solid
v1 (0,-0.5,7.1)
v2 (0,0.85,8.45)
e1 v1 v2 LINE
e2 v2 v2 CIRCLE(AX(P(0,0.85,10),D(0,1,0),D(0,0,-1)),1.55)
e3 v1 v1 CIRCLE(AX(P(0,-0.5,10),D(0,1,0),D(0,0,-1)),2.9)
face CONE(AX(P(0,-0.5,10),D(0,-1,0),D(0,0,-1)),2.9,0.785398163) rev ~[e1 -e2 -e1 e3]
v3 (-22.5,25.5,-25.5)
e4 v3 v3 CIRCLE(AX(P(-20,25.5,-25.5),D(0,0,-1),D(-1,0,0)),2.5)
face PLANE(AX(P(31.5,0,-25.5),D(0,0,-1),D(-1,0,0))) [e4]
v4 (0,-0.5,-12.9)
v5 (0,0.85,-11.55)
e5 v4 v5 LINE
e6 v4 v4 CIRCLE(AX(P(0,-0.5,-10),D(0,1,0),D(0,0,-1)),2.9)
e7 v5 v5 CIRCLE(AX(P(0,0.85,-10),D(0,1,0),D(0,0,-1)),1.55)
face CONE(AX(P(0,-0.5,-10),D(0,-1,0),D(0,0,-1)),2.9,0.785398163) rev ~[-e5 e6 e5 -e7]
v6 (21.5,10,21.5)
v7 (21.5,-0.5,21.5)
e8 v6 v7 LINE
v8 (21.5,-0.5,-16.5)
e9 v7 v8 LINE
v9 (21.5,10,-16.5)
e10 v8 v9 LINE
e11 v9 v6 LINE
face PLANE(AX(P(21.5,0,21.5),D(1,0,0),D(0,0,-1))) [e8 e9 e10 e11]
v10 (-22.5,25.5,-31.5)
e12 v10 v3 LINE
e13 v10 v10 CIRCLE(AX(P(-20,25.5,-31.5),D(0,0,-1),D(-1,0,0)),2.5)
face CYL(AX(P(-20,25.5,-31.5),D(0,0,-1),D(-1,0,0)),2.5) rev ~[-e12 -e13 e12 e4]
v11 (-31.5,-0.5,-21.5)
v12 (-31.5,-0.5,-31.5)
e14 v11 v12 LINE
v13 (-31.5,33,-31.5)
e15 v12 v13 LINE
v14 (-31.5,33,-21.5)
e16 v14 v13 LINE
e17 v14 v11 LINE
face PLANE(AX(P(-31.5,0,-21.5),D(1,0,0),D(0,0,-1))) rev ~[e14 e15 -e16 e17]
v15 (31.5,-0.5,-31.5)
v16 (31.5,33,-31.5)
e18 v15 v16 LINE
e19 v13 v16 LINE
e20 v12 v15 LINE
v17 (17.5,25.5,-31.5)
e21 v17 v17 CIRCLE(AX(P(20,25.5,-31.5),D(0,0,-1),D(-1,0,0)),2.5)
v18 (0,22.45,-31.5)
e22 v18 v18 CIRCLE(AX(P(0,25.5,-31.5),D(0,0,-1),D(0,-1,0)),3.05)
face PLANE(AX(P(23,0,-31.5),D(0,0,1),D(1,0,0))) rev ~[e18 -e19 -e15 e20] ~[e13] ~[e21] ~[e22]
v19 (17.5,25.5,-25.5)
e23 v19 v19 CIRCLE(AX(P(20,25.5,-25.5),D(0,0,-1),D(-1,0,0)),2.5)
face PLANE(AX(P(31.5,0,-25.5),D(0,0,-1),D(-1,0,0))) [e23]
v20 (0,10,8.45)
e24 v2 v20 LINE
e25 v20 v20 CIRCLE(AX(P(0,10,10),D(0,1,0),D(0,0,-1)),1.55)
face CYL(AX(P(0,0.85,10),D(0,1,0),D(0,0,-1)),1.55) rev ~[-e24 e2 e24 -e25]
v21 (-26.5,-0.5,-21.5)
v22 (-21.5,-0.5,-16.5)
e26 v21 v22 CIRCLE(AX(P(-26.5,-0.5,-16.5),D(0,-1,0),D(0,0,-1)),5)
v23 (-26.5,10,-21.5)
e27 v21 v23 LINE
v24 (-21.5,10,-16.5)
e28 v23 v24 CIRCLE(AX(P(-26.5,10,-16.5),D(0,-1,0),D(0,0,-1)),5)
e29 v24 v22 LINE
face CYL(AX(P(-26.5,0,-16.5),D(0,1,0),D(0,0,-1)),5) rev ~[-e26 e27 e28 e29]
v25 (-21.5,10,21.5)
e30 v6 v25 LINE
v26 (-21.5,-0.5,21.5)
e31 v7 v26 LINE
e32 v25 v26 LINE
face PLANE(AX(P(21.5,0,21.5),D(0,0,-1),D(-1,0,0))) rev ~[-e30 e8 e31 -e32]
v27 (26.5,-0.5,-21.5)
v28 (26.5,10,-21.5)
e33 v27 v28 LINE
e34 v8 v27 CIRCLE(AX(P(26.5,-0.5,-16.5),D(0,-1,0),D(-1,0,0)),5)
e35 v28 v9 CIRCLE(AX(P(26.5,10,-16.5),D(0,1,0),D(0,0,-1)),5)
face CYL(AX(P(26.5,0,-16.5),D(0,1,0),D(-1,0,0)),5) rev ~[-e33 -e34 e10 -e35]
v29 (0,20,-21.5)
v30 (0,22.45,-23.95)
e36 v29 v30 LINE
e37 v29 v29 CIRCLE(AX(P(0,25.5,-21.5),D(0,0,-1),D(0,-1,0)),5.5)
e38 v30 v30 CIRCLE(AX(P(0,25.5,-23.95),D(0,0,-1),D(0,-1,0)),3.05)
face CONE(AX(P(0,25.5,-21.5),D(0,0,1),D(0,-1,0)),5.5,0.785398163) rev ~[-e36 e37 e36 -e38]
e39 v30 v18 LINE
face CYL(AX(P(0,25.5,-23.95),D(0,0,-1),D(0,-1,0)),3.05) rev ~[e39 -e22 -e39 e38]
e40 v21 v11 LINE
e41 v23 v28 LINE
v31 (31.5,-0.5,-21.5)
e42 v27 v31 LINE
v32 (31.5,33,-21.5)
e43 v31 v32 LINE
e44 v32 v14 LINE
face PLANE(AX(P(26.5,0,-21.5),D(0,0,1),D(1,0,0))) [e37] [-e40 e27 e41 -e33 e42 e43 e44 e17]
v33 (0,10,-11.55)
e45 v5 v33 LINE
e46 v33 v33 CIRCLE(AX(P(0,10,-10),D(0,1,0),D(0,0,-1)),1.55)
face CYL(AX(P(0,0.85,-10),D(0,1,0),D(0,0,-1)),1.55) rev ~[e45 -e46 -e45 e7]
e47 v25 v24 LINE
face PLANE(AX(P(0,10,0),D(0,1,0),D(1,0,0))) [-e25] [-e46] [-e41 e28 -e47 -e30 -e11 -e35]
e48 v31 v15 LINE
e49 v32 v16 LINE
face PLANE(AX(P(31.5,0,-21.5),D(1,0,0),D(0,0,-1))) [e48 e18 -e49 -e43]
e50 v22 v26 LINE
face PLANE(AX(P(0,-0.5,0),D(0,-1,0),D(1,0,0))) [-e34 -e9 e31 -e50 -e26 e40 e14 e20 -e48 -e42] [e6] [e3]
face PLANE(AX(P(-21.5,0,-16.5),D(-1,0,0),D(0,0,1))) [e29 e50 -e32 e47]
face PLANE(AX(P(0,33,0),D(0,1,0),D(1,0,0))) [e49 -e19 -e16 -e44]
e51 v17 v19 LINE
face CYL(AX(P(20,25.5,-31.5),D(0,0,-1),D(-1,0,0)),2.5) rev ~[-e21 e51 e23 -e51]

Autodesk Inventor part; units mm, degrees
ref_plane "YZ Plane" through (0, 0, 0) normal (1, 0, 0) x (0, 1, 0)
ref_plane "XZ Plane" through (0, 0, 0) normal (0, 1, 0) x (-1, 0, 0)
ref_plane "XY Plane" through (0, 0, 0) normal (0, 0, 1) x (1, 0, 0)
sketch "Sketch1" plane through (0, 0, 0) normal (0, 1, 0) x (-1, 0, 0)
  line L0 (21.5, 21.5) -> (-21.5, 21.5)
  line L1 (-21.5, 21.5) -> (-21.5, -21.5)
  line L2 (-21.5, -21.5) -> (21.5, -21.5)
  line L3 (21.5, -21.5) -> (21.5, 21.5)
  line L4 (21.5, 21.5) -> (-21.5, -21.5) construction
  line L5 (-21.5, 21.5) -> (21.5, -21.5) construction
  point P0 (0, 0)
  dimension "d0" = 43
  dimension "d1" = 43
extrude "Extrusion1" add sketch "Sketch1" along normal blind 10
sketch "Sketch3" plane through (0, 0, 0) normal (0, 1, 0) x (-1, 0, 0)
  line L0 (31.5, -31.5) -> (-31.5, -31.5)
  line L1 (-31.5, -31.5) -> (-31.5, 31.5)
  line L2 (-31.5, 31.5) -> (31.5, 31.5)
  line L3 (31.5, 31.5) -> (31.5, -31.5)
  line L4 (31.5, -31.5) -> (-31.5, 31.5) construction
  line L5 (-31.5, -31.5) -> (31.5, 31.5) construction
  line L6 (-21.5, 21.5) -> (-21.5, -21.5) projected
  line L7 (21.5, 21.5) -> (-21.5, 21.5)
  line L8 (-21.5, 21.5) -> (-21.5, -21.5)
  line L9 (-21.5, -21.5) -> (21.5, -21.5)
  line L10 (21.5, -21.5) -> (21.5, 21.5)
  line L11 (21.5, 21.5) -> (-21.5, -21.5) construction
  line L12 (-21.5, 21.5) -> (21.5, -21.5) construction
  point P0 (0, 0)
  dimension "d13" = 63
  dimension "d14" = 63
extrude "Extrusion2" add sketch "Sketch3" along normal blind 15
sketch "Sketch4" plane through (0, 15, 0) normal (0, 1, 0) x (1, 0, 0)
  line L0 (31.5, -31.5) -> (31.5, 31.5) projected
  line L1 (-31.5, 31.5) -> (31.5, 31.5)
  line L2 (31.5, 31.5) -> (31.5, 21.5)
  line L3 (31.5, 21.5) -> (-31.5, 21.5)
  line L4 (-31.5, 21.5) -> (-31.5, 31.5)
  point P0 (0, 0)
  dimension "d17" = 10
extrude "Extrusion3" add sketch "Sketch4" along normal blind 18
sketch "Sketch5" plane through (31.5, 0, -31.5) normal (0, 0, -1) x (-1, 0, 0)
  line L0 (0, 15) -> (0, 33) construction
  line L1 (63, 15) -> (63, 33) construction
  line L2 (0, 33) -> (63, 33) construction
  line L3 (63, 33) -> (63, 18) construction
  line L4 (63, 18) -> (0, 18) construction
  line L5 (0, 18) -> (0, 33) construction
  line L6 (0, 18) -> (0, 25.5) construction
  line L7 (0, 29.25) -> (63, 29.25)
  line L8 (63, 29.25) -> (63, 21.75)
  line L9 (63, 21.75) -> (0, 21.75)
  line L10 (-63, 29.25) -> (63, 21.75) construction
  line L11 (63, 29.25) -> (-63, 21.75) construction
  line L12 (0, 29.25) -> (0, 21.75)
  line L13 (31.5, 33) -> (31.5, 25.5) construction
  line L14 (31.5, 25.5) -> (11.5, 25.5) construction
  line L15 (31.5, 25.5) -> (51.5, 25.5) construction
  circle A0 centre (11.5, 25.5) radius 2.5
  circle A1 centre (51.5, 25.5) radius 2.5
  point P0 (31.5, 0)
  dimension "d20" = 15
  dimension "d21" = 7.5
  dimension "d22" = 7.5
  dimension "d33" = 20
  dimension "d34" = 20
  dimension "d35" = 5
  dimension "d36" = 5
sketch "Sketch6" plane through (-21.5, 10, -21.5) normal (0, 0, 1) x (1, 0, 0)
  line L0 (-10, 23) -> (53, 23) construction
  line L1 (53, 23) -> (53, 15.5) construction
  line L2 (53, -10) -> (53, 23) construction
  line L3 (53, 15.5) -> (-10, 15.5) construction
  line L4 (-10, -10) -> (-10, 23) construction
  line L5 (21.5, 23) -> (21.5, 15.5) construction
  point P0 (21.5, -10)
  dimension "d25" = 7.5
hole "Hole2" at (0, 25.5, -21.5) direction (0, 0, -1) diameter 6.1 end through all countersink diameter 11 countersink angle 90 clearance for "Countersunk Flat Head Screw ISO 2009/7046" size "M6" standard "ISO"
extrude "Extrusion5" cut sketch "Sketch5" against normal blind 6 contours A0 | A1
sketch "Sketch7" plane through (0, 15, 0) normal (0, 1, 0) x (1, 0, 0)
  line L0 (-31.5, -31.5) -> (31.5, -31.5) projected
  line L1 (21.5, 21.5) -> (-21.5, 21.5) projected
  line L2 (-31.5, -31.5) -> (-21.5, -31.5)
  line L3 (-21.5, -31.5) -> (-21.5, 21.5)
  line L4 (-21.5, 21.5) -> (-31.5, 21.5)
  line L5 (-31.5, 21.5) -> (-31.5, -31.5)
  point P0 (0, 0)
extrude "Extrusion6" add sketch "Sketch7" along normal up to surface (18 mm away)
fillet "Fillet1" radius 18 1 edges at (-26.5, 33, 31.5)
sketch "Sketch9" plane through (0, 33, 0) normal (0, 1, 0) x (1, 0, 0)
  line L0 (21.5, 21.5) -> (-21.5, 21.5) construction
  line L1 (-21.5, 21.5) -> (-31.5, 21.5) construction
  line L2 (-31.5, 31.5) -> (-31.5, -13.5) construction
  line L3 (31.5, -31.5) -> (31.5, 21.5) projected
  line L4 (-31.5, 21.5) -> (31.5, 21.5)
  line L5 (31.5, 21.5) -> (31.5, -31.5)
  line L6 (31.5, -31.5) -> (-31.5, -31.5)
  line L7 (-31.5, -31.5) -> (-31.5, 21.5)
  point P0 (0, 0)
extrude "Extrusion7" cut sketch "Sketch9" against normal up to surface (23 mm away)
sketch "Sketch10" plane through (0, 10, 0) normal (0, 1, 0) x (1, 0, 0)
  line L0 (21.5, -21.5) -> (-21.5, -21.5)
  line L1 (-21.5, -21.5) -> (-21.5, 21.5)
  line L2 (-21.5, 21.5) -> (21.5, 21.5)
  line L3 (21.5, 21.5) -> (21.5, -21.5)
  line L4 (21.5, -21.5) -> (-21.5, 21.5) construction
  line L5 (-21.5, -21.5) -> (21.5, 21.5) construction
  line L6 (31.5, -31.5) -> (-31.5, -31.5) projected
  line L7 (-31.5, 31.5) -> (31.5, 31.5)
  line L8 (31.5, 31.5) -> (31.5, -31.5)
  line L9 (31.5, -31.5) -> (-31.5, -31.5)
  line L10 (-31.5, -31.5) -> (-31.5, 31.5)
  line L11 (-31.5, 31.5) -> (31.5, -31.5) construction
  line L12 (31.5, 31.5) -> (-31.5, -31.5) construction
  line L13 (-31.5, 21.5) -> (31.5, 21.5) projected
  line L14 (21.5, 21.5) -> (31.5, 21.5)
  line L15 (-31.5, 21.5) -> (-21.5, 21.5)
  point P0 (0, 0)
  dimension "d55" = 43
  dimension "d56" = 43
extrude "Extrusion8" cut sketch "Sketch10" against normal through all contours L3 L13 L8 L6 L10 L1 L0
fillet "Fillet2" radius 5 2 edges at (21.5, 5, -21.5) (-21.5, 5, -21.5)
sketch "Sketch11" plane through (0, 0, 0) normal (0, -1, 0) x (1, 0, 0)
  line L0 (21.5, 21.5) -> (-21.5, 21.5) projected
  line L1 (17, -31.5) -> (23, -31.5) projected
  line L2 (-21.5, 21.5) -> (21.5, 21.5)
  line L3 (21.5, 21.5) -> (21.5, -16.5)
  line L4 (21.5, -31.5) -> (-21.5, -31.5)
  line L5 (-21.5, -16.5) -> (-21.5, 21.5)
  line L6 (31.5, -21.5) -> (31.5, -31.5) projected
  line L7 (-26.5, -21.5) -> (-31.5, -21.5)
  line L8 (-31.5, -21.5) -> (-31.5, -31.5)
  line L9 (-31.5, -31.5) -> (31.5, -31.5)
  line L10 (31.5, -31.5) -> (31.5, -21.5)
  arc A0 (-26.5, -21.5) -> (-21.5, -16.5) centre (-26.5, -16.5) ccw
  arc A1 (21.5, -16.5) -> (26.5, -21.5) centre (26.5, -16.5) ccw projected
  arc A2 (21.5, -16.5) -> (26.5, -21.5) centre (26.5, -16.5) ccw
  line L11 (26.5, -21.5) -> (31.5, -21.5)
  point P0 (0, 0)
  dimension "d64" = 63
  dimension "d65" = 5
extrude "Extrusion9" add sketch "Sketch11" along normal blind 0.5
sketch "Sketch12" plane through (0, -0.5, 0) normal (0, -1, 0) x (1, 0, 0)
  line L0 (0, 0) -> (0, 10)
  line L1 (0, 0) -> (0, -10)
  dimension "d68" = 10
  dimension "d69" = 10
hole "Hole4" at (0, -0.5, -10) at (0, -0.5, 10) direction (0, 1, 0) diameter 3.1 end through all countersink diameter 5.8 countersink angle 90 clearance for "Countersunk Flat Head Screw ISO 2009/7046" size "M3" standard "ISO"
properties part number "Camera Holder"
